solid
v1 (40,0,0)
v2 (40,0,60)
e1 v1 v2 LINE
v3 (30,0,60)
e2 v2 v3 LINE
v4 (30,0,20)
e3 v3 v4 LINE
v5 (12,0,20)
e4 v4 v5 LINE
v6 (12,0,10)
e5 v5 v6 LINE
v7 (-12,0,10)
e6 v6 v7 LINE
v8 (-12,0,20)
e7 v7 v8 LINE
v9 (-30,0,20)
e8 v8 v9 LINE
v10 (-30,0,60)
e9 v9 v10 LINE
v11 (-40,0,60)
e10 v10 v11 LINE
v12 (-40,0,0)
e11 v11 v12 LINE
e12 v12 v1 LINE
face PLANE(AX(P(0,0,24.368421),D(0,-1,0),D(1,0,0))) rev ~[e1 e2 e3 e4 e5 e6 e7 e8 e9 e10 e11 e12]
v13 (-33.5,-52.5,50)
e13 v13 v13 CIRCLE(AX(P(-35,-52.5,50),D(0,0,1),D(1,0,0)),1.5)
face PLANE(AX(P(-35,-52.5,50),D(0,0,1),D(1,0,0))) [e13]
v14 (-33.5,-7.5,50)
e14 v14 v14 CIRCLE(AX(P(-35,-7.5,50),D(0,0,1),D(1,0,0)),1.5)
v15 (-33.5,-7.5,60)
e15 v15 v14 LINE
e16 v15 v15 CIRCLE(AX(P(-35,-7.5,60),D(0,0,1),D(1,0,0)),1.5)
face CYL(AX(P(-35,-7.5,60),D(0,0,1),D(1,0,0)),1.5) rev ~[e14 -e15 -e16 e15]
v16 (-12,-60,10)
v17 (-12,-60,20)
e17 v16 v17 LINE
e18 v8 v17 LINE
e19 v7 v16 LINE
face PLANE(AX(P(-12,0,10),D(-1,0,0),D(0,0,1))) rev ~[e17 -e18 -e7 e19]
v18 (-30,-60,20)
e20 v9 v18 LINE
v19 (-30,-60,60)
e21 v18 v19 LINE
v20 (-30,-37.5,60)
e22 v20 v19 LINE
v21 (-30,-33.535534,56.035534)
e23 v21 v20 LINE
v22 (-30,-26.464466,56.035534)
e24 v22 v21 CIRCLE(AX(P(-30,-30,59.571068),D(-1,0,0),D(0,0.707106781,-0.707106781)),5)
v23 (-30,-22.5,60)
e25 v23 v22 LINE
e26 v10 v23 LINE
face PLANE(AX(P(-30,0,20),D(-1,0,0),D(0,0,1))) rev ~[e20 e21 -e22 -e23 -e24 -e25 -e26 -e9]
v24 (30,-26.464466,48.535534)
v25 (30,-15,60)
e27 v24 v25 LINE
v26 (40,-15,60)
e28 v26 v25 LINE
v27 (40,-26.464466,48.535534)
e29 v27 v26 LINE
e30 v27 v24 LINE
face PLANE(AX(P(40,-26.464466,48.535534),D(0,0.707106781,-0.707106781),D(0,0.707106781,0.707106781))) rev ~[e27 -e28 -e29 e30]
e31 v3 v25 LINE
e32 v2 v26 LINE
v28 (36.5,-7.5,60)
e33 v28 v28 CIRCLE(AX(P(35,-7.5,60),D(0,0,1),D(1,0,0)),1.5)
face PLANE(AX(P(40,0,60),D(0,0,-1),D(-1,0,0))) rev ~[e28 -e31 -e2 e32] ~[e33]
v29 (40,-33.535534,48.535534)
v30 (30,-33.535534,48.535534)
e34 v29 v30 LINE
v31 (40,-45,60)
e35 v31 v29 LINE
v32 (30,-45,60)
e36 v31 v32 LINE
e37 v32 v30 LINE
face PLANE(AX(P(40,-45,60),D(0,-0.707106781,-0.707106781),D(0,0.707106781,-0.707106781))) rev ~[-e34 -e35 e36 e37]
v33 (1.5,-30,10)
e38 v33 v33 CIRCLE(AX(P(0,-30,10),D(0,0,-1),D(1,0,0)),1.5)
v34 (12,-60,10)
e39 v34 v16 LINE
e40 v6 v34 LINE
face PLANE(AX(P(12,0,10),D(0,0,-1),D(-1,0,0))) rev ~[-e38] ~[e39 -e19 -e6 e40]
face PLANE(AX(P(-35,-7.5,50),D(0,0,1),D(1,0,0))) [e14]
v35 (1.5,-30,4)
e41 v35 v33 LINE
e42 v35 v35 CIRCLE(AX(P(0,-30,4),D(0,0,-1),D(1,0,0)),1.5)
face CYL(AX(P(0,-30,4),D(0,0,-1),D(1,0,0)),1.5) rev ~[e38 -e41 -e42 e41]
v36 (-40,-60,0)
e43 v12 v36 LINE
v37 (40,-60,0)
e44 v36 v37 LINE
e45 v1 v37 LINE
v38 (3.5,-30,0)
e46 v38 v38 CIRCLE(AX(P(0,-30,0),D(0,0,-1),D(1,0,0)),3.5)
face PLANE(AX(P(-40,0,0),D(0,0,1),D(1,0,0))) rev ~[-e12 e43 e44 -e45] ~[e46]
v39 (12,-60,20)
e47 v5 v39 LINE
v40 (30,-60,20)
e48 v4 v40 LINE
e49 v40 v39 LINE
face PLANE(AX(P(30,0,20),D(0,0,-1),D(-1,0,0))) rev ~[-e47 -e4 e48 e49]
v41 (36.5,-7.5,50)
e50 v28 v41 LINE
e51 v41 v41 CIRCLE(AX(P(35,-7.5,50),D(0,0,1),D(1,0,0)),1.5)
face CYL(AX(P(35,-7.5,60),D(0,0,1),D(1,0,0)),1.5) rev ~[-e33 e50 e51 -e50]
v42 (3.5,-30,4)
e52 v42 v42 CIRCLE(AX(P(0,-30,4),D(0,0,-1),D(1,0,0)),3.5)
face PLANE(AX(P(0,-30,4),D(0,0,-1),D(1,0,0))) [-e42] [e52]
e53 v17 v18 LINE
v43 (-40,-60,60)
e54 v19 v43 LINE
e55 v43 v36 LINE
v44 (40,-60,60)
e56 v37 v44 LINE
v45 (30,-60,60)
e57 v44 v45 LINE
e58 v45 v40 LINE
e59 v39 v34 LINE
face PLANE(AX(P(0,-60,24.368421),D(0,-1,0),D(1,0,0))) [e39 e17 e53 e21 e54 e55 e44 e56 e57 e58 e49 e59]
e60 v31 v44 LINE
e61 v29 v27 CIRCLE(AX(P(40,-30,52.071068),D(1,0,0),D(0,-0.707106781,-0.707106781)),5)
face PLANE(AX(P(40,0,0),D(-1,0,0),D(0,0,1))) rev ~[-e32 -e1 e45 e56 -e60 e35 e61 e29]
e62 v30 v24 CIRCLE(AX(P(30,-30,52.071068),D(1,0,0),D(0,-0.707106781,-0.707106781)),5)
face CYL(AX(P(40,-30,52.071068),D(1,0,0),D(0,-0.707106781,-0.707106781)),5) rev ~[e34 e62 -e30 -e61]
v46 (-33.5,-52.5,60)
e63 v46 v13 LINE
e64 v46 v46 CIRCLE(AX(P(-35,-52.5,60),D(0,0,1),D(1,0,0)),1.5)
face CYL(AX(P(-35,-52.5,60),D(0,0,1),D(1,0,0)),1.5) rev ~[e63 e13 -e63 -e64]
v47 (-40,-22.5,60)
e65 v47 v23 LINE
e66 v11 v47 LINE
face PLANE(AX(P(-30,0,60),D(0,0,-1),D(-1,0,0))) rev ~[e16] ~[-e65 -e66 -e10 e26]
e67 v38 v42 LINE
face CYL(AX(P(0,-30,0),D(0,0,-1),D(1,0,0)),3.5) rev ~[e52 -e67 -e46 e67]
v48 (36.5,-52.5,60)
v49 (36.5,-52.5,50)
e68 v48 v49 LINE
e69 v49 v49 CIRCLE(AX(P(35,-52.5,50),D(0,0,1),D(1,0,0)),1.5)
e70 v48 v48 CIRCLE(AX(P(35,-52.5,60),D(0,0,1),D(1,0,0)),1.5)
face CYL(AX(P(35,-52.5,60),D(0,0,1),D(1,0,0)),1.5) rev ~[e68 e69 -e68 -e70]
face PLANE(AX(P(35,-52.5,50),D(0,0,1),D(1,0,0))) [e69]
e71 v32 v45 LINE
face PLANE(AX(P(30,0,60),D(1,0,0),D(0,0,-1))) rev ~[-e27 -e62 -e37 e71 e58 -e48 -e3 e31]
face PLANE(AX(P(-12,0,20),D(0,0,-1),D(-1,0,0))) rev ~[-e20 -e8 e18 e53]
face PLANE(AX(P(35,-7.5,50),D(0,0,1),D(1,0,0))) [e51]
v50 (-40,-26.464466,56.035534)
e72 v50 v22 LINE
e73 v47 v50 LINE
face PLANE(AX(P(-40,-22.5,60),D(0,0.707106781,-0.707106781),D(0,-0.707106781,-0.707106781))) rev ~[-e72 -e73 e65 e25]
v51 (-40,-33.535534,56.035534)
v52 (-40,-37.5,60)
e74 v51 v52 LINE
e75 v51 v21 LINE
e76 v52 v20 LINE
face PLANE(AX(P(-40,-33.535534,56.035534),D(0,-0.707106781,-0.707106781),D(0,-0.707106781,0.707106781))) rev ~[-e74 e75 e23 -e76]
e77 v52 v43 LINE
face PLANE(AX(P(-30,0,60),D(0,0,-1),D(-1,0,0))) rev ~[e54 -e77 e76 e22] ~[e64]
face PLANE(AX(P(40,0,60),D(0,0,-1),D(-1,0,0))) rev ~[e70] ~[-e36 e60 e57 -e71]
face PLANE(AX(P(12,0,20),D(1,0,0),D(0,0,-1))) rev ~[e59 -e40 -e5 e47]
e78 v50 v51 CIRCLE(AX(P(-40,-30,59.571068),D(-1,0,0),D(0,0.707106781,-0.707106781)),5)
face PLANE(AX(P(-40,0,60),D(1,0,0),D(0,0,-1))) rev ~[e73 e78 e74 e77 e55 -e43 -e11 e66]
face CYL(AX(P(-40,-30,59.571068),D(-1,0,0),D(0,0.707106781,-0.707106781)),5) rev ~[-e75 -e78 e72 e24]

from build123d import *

# Parameters (mm, degrees)
F1_DEPTH  = 60
F3_DEPTH  = 10
F5_DEPTH  = 10
F6_R      = 1.5
F7_R      = 1.5
F8_R      = 1.5
F9_R      = 1.5
F10_DEPTH = 10
F11_R     = 3.5
F12_DEPTH = 4
F13_R     = 1.5
F14_DEPTH = 6


# Not quite as in the source:
# - a feature names something its author has since deleted; it is built from what else it names


with BuildPart() as f1:
    # F0 (on Front) → F1 (new body)
    with BuildSketch(Plane.XZ):
        Polygon((-40, 60), (-40, 0), (40, 0), (40, 60), (30, 60), (30, 20), (12, 20), (12, 10), (-12, 10), (-12, 20), (-30, 20), (-30, 60), align=None)
    extrude(amount=F1_DEPTH)

    # F2 (on face) → F3 (cut, through all)
    with BuildSketch(Plane.YZ.offset(40)):
        with BuildLine():
            ThreePointArc((-33.5355339059, 48.5355339059), (-30, 47.0710678119), (-26.4644660941, 48.5355339059))
            Line((-26.4644660941, 48.5355339059), (-15, 60))
            Line((-15, 60), (-45, 60))
            Line((-45, 60), (-33.5355339059, 48.5355339059))
        make_face()
    extrude(amount=-F3_DEPTH, mode=Mode.SUBTRACT)

    # F4 (on face) → F5 (cut, through all)
    with BuildSketch(Plane(origin=(-40, 0, 0), x_dir=(0, -1, 0), z_dir=(-1, 0, 0))):
        with BuildLine():
            Line((37.5, 60), (22.5, 60))
            Line((22.5, 60), (26.4644660941, 56.0355339059))
            ThreePointArc((26.4644660941, 56.0355339059), (30, 54.5710678119), (33.5355339059, 56.0355339059))
            Line((33.5355339059, 56.0355339059), (37.5, 60))
        make_face()
    extrude(amount=-F5_DEPTH, mode=Mode.SUBTRACT)

    # F6 (on face) + F7 (on face) + F8 (on face) + F9 (on face) → F10 (cut)
    with BuildSketch(Plane.XY.offset(60)):
        with Locations((-35, -7.5)):
            Circle(F6_R)
    with BuildSketch(Plane.XY.offset(60)):
        with Locations((-35, -52.5)):
            Circle(F7_R)
    with BuildSketch(Plane.XY.offset(60)):
        with Locations((35, -7.5)):
            Circle(F8_R)
    with BuildSketch(Plane.XY.offset(60)):
        with Locations((35, -52.5)):
            Circle(F9_R)
    extrude(amount=-F10_DEPTH, mode=Mode.SUBTRACT)

    # F11 (on face) → F12 (cut)
    with BuildSketch(Plane(origin=(0, 0, 0), x_dir=(1, 0, 0), z_dir=(0, 0, -1))):
        with Locations((0, 30)):
            Circle(F11_R)
    extrude(amount=-F12_DEPTH, mode=Mode.SUBTRACT)

    # F13 (on face) → F14 (cut, through all)
    with BuildSketch(Plane(origin=(0, 0, 4), x_dir=(1, 0, 0), z_dir=(0, 0, -1))):
        with Locations((0, 30)):
            Circle(F13_R)
    extrude(amount=-F14_DEPTH, mode=Mode.SUBTRACT)


solid = f1.part
